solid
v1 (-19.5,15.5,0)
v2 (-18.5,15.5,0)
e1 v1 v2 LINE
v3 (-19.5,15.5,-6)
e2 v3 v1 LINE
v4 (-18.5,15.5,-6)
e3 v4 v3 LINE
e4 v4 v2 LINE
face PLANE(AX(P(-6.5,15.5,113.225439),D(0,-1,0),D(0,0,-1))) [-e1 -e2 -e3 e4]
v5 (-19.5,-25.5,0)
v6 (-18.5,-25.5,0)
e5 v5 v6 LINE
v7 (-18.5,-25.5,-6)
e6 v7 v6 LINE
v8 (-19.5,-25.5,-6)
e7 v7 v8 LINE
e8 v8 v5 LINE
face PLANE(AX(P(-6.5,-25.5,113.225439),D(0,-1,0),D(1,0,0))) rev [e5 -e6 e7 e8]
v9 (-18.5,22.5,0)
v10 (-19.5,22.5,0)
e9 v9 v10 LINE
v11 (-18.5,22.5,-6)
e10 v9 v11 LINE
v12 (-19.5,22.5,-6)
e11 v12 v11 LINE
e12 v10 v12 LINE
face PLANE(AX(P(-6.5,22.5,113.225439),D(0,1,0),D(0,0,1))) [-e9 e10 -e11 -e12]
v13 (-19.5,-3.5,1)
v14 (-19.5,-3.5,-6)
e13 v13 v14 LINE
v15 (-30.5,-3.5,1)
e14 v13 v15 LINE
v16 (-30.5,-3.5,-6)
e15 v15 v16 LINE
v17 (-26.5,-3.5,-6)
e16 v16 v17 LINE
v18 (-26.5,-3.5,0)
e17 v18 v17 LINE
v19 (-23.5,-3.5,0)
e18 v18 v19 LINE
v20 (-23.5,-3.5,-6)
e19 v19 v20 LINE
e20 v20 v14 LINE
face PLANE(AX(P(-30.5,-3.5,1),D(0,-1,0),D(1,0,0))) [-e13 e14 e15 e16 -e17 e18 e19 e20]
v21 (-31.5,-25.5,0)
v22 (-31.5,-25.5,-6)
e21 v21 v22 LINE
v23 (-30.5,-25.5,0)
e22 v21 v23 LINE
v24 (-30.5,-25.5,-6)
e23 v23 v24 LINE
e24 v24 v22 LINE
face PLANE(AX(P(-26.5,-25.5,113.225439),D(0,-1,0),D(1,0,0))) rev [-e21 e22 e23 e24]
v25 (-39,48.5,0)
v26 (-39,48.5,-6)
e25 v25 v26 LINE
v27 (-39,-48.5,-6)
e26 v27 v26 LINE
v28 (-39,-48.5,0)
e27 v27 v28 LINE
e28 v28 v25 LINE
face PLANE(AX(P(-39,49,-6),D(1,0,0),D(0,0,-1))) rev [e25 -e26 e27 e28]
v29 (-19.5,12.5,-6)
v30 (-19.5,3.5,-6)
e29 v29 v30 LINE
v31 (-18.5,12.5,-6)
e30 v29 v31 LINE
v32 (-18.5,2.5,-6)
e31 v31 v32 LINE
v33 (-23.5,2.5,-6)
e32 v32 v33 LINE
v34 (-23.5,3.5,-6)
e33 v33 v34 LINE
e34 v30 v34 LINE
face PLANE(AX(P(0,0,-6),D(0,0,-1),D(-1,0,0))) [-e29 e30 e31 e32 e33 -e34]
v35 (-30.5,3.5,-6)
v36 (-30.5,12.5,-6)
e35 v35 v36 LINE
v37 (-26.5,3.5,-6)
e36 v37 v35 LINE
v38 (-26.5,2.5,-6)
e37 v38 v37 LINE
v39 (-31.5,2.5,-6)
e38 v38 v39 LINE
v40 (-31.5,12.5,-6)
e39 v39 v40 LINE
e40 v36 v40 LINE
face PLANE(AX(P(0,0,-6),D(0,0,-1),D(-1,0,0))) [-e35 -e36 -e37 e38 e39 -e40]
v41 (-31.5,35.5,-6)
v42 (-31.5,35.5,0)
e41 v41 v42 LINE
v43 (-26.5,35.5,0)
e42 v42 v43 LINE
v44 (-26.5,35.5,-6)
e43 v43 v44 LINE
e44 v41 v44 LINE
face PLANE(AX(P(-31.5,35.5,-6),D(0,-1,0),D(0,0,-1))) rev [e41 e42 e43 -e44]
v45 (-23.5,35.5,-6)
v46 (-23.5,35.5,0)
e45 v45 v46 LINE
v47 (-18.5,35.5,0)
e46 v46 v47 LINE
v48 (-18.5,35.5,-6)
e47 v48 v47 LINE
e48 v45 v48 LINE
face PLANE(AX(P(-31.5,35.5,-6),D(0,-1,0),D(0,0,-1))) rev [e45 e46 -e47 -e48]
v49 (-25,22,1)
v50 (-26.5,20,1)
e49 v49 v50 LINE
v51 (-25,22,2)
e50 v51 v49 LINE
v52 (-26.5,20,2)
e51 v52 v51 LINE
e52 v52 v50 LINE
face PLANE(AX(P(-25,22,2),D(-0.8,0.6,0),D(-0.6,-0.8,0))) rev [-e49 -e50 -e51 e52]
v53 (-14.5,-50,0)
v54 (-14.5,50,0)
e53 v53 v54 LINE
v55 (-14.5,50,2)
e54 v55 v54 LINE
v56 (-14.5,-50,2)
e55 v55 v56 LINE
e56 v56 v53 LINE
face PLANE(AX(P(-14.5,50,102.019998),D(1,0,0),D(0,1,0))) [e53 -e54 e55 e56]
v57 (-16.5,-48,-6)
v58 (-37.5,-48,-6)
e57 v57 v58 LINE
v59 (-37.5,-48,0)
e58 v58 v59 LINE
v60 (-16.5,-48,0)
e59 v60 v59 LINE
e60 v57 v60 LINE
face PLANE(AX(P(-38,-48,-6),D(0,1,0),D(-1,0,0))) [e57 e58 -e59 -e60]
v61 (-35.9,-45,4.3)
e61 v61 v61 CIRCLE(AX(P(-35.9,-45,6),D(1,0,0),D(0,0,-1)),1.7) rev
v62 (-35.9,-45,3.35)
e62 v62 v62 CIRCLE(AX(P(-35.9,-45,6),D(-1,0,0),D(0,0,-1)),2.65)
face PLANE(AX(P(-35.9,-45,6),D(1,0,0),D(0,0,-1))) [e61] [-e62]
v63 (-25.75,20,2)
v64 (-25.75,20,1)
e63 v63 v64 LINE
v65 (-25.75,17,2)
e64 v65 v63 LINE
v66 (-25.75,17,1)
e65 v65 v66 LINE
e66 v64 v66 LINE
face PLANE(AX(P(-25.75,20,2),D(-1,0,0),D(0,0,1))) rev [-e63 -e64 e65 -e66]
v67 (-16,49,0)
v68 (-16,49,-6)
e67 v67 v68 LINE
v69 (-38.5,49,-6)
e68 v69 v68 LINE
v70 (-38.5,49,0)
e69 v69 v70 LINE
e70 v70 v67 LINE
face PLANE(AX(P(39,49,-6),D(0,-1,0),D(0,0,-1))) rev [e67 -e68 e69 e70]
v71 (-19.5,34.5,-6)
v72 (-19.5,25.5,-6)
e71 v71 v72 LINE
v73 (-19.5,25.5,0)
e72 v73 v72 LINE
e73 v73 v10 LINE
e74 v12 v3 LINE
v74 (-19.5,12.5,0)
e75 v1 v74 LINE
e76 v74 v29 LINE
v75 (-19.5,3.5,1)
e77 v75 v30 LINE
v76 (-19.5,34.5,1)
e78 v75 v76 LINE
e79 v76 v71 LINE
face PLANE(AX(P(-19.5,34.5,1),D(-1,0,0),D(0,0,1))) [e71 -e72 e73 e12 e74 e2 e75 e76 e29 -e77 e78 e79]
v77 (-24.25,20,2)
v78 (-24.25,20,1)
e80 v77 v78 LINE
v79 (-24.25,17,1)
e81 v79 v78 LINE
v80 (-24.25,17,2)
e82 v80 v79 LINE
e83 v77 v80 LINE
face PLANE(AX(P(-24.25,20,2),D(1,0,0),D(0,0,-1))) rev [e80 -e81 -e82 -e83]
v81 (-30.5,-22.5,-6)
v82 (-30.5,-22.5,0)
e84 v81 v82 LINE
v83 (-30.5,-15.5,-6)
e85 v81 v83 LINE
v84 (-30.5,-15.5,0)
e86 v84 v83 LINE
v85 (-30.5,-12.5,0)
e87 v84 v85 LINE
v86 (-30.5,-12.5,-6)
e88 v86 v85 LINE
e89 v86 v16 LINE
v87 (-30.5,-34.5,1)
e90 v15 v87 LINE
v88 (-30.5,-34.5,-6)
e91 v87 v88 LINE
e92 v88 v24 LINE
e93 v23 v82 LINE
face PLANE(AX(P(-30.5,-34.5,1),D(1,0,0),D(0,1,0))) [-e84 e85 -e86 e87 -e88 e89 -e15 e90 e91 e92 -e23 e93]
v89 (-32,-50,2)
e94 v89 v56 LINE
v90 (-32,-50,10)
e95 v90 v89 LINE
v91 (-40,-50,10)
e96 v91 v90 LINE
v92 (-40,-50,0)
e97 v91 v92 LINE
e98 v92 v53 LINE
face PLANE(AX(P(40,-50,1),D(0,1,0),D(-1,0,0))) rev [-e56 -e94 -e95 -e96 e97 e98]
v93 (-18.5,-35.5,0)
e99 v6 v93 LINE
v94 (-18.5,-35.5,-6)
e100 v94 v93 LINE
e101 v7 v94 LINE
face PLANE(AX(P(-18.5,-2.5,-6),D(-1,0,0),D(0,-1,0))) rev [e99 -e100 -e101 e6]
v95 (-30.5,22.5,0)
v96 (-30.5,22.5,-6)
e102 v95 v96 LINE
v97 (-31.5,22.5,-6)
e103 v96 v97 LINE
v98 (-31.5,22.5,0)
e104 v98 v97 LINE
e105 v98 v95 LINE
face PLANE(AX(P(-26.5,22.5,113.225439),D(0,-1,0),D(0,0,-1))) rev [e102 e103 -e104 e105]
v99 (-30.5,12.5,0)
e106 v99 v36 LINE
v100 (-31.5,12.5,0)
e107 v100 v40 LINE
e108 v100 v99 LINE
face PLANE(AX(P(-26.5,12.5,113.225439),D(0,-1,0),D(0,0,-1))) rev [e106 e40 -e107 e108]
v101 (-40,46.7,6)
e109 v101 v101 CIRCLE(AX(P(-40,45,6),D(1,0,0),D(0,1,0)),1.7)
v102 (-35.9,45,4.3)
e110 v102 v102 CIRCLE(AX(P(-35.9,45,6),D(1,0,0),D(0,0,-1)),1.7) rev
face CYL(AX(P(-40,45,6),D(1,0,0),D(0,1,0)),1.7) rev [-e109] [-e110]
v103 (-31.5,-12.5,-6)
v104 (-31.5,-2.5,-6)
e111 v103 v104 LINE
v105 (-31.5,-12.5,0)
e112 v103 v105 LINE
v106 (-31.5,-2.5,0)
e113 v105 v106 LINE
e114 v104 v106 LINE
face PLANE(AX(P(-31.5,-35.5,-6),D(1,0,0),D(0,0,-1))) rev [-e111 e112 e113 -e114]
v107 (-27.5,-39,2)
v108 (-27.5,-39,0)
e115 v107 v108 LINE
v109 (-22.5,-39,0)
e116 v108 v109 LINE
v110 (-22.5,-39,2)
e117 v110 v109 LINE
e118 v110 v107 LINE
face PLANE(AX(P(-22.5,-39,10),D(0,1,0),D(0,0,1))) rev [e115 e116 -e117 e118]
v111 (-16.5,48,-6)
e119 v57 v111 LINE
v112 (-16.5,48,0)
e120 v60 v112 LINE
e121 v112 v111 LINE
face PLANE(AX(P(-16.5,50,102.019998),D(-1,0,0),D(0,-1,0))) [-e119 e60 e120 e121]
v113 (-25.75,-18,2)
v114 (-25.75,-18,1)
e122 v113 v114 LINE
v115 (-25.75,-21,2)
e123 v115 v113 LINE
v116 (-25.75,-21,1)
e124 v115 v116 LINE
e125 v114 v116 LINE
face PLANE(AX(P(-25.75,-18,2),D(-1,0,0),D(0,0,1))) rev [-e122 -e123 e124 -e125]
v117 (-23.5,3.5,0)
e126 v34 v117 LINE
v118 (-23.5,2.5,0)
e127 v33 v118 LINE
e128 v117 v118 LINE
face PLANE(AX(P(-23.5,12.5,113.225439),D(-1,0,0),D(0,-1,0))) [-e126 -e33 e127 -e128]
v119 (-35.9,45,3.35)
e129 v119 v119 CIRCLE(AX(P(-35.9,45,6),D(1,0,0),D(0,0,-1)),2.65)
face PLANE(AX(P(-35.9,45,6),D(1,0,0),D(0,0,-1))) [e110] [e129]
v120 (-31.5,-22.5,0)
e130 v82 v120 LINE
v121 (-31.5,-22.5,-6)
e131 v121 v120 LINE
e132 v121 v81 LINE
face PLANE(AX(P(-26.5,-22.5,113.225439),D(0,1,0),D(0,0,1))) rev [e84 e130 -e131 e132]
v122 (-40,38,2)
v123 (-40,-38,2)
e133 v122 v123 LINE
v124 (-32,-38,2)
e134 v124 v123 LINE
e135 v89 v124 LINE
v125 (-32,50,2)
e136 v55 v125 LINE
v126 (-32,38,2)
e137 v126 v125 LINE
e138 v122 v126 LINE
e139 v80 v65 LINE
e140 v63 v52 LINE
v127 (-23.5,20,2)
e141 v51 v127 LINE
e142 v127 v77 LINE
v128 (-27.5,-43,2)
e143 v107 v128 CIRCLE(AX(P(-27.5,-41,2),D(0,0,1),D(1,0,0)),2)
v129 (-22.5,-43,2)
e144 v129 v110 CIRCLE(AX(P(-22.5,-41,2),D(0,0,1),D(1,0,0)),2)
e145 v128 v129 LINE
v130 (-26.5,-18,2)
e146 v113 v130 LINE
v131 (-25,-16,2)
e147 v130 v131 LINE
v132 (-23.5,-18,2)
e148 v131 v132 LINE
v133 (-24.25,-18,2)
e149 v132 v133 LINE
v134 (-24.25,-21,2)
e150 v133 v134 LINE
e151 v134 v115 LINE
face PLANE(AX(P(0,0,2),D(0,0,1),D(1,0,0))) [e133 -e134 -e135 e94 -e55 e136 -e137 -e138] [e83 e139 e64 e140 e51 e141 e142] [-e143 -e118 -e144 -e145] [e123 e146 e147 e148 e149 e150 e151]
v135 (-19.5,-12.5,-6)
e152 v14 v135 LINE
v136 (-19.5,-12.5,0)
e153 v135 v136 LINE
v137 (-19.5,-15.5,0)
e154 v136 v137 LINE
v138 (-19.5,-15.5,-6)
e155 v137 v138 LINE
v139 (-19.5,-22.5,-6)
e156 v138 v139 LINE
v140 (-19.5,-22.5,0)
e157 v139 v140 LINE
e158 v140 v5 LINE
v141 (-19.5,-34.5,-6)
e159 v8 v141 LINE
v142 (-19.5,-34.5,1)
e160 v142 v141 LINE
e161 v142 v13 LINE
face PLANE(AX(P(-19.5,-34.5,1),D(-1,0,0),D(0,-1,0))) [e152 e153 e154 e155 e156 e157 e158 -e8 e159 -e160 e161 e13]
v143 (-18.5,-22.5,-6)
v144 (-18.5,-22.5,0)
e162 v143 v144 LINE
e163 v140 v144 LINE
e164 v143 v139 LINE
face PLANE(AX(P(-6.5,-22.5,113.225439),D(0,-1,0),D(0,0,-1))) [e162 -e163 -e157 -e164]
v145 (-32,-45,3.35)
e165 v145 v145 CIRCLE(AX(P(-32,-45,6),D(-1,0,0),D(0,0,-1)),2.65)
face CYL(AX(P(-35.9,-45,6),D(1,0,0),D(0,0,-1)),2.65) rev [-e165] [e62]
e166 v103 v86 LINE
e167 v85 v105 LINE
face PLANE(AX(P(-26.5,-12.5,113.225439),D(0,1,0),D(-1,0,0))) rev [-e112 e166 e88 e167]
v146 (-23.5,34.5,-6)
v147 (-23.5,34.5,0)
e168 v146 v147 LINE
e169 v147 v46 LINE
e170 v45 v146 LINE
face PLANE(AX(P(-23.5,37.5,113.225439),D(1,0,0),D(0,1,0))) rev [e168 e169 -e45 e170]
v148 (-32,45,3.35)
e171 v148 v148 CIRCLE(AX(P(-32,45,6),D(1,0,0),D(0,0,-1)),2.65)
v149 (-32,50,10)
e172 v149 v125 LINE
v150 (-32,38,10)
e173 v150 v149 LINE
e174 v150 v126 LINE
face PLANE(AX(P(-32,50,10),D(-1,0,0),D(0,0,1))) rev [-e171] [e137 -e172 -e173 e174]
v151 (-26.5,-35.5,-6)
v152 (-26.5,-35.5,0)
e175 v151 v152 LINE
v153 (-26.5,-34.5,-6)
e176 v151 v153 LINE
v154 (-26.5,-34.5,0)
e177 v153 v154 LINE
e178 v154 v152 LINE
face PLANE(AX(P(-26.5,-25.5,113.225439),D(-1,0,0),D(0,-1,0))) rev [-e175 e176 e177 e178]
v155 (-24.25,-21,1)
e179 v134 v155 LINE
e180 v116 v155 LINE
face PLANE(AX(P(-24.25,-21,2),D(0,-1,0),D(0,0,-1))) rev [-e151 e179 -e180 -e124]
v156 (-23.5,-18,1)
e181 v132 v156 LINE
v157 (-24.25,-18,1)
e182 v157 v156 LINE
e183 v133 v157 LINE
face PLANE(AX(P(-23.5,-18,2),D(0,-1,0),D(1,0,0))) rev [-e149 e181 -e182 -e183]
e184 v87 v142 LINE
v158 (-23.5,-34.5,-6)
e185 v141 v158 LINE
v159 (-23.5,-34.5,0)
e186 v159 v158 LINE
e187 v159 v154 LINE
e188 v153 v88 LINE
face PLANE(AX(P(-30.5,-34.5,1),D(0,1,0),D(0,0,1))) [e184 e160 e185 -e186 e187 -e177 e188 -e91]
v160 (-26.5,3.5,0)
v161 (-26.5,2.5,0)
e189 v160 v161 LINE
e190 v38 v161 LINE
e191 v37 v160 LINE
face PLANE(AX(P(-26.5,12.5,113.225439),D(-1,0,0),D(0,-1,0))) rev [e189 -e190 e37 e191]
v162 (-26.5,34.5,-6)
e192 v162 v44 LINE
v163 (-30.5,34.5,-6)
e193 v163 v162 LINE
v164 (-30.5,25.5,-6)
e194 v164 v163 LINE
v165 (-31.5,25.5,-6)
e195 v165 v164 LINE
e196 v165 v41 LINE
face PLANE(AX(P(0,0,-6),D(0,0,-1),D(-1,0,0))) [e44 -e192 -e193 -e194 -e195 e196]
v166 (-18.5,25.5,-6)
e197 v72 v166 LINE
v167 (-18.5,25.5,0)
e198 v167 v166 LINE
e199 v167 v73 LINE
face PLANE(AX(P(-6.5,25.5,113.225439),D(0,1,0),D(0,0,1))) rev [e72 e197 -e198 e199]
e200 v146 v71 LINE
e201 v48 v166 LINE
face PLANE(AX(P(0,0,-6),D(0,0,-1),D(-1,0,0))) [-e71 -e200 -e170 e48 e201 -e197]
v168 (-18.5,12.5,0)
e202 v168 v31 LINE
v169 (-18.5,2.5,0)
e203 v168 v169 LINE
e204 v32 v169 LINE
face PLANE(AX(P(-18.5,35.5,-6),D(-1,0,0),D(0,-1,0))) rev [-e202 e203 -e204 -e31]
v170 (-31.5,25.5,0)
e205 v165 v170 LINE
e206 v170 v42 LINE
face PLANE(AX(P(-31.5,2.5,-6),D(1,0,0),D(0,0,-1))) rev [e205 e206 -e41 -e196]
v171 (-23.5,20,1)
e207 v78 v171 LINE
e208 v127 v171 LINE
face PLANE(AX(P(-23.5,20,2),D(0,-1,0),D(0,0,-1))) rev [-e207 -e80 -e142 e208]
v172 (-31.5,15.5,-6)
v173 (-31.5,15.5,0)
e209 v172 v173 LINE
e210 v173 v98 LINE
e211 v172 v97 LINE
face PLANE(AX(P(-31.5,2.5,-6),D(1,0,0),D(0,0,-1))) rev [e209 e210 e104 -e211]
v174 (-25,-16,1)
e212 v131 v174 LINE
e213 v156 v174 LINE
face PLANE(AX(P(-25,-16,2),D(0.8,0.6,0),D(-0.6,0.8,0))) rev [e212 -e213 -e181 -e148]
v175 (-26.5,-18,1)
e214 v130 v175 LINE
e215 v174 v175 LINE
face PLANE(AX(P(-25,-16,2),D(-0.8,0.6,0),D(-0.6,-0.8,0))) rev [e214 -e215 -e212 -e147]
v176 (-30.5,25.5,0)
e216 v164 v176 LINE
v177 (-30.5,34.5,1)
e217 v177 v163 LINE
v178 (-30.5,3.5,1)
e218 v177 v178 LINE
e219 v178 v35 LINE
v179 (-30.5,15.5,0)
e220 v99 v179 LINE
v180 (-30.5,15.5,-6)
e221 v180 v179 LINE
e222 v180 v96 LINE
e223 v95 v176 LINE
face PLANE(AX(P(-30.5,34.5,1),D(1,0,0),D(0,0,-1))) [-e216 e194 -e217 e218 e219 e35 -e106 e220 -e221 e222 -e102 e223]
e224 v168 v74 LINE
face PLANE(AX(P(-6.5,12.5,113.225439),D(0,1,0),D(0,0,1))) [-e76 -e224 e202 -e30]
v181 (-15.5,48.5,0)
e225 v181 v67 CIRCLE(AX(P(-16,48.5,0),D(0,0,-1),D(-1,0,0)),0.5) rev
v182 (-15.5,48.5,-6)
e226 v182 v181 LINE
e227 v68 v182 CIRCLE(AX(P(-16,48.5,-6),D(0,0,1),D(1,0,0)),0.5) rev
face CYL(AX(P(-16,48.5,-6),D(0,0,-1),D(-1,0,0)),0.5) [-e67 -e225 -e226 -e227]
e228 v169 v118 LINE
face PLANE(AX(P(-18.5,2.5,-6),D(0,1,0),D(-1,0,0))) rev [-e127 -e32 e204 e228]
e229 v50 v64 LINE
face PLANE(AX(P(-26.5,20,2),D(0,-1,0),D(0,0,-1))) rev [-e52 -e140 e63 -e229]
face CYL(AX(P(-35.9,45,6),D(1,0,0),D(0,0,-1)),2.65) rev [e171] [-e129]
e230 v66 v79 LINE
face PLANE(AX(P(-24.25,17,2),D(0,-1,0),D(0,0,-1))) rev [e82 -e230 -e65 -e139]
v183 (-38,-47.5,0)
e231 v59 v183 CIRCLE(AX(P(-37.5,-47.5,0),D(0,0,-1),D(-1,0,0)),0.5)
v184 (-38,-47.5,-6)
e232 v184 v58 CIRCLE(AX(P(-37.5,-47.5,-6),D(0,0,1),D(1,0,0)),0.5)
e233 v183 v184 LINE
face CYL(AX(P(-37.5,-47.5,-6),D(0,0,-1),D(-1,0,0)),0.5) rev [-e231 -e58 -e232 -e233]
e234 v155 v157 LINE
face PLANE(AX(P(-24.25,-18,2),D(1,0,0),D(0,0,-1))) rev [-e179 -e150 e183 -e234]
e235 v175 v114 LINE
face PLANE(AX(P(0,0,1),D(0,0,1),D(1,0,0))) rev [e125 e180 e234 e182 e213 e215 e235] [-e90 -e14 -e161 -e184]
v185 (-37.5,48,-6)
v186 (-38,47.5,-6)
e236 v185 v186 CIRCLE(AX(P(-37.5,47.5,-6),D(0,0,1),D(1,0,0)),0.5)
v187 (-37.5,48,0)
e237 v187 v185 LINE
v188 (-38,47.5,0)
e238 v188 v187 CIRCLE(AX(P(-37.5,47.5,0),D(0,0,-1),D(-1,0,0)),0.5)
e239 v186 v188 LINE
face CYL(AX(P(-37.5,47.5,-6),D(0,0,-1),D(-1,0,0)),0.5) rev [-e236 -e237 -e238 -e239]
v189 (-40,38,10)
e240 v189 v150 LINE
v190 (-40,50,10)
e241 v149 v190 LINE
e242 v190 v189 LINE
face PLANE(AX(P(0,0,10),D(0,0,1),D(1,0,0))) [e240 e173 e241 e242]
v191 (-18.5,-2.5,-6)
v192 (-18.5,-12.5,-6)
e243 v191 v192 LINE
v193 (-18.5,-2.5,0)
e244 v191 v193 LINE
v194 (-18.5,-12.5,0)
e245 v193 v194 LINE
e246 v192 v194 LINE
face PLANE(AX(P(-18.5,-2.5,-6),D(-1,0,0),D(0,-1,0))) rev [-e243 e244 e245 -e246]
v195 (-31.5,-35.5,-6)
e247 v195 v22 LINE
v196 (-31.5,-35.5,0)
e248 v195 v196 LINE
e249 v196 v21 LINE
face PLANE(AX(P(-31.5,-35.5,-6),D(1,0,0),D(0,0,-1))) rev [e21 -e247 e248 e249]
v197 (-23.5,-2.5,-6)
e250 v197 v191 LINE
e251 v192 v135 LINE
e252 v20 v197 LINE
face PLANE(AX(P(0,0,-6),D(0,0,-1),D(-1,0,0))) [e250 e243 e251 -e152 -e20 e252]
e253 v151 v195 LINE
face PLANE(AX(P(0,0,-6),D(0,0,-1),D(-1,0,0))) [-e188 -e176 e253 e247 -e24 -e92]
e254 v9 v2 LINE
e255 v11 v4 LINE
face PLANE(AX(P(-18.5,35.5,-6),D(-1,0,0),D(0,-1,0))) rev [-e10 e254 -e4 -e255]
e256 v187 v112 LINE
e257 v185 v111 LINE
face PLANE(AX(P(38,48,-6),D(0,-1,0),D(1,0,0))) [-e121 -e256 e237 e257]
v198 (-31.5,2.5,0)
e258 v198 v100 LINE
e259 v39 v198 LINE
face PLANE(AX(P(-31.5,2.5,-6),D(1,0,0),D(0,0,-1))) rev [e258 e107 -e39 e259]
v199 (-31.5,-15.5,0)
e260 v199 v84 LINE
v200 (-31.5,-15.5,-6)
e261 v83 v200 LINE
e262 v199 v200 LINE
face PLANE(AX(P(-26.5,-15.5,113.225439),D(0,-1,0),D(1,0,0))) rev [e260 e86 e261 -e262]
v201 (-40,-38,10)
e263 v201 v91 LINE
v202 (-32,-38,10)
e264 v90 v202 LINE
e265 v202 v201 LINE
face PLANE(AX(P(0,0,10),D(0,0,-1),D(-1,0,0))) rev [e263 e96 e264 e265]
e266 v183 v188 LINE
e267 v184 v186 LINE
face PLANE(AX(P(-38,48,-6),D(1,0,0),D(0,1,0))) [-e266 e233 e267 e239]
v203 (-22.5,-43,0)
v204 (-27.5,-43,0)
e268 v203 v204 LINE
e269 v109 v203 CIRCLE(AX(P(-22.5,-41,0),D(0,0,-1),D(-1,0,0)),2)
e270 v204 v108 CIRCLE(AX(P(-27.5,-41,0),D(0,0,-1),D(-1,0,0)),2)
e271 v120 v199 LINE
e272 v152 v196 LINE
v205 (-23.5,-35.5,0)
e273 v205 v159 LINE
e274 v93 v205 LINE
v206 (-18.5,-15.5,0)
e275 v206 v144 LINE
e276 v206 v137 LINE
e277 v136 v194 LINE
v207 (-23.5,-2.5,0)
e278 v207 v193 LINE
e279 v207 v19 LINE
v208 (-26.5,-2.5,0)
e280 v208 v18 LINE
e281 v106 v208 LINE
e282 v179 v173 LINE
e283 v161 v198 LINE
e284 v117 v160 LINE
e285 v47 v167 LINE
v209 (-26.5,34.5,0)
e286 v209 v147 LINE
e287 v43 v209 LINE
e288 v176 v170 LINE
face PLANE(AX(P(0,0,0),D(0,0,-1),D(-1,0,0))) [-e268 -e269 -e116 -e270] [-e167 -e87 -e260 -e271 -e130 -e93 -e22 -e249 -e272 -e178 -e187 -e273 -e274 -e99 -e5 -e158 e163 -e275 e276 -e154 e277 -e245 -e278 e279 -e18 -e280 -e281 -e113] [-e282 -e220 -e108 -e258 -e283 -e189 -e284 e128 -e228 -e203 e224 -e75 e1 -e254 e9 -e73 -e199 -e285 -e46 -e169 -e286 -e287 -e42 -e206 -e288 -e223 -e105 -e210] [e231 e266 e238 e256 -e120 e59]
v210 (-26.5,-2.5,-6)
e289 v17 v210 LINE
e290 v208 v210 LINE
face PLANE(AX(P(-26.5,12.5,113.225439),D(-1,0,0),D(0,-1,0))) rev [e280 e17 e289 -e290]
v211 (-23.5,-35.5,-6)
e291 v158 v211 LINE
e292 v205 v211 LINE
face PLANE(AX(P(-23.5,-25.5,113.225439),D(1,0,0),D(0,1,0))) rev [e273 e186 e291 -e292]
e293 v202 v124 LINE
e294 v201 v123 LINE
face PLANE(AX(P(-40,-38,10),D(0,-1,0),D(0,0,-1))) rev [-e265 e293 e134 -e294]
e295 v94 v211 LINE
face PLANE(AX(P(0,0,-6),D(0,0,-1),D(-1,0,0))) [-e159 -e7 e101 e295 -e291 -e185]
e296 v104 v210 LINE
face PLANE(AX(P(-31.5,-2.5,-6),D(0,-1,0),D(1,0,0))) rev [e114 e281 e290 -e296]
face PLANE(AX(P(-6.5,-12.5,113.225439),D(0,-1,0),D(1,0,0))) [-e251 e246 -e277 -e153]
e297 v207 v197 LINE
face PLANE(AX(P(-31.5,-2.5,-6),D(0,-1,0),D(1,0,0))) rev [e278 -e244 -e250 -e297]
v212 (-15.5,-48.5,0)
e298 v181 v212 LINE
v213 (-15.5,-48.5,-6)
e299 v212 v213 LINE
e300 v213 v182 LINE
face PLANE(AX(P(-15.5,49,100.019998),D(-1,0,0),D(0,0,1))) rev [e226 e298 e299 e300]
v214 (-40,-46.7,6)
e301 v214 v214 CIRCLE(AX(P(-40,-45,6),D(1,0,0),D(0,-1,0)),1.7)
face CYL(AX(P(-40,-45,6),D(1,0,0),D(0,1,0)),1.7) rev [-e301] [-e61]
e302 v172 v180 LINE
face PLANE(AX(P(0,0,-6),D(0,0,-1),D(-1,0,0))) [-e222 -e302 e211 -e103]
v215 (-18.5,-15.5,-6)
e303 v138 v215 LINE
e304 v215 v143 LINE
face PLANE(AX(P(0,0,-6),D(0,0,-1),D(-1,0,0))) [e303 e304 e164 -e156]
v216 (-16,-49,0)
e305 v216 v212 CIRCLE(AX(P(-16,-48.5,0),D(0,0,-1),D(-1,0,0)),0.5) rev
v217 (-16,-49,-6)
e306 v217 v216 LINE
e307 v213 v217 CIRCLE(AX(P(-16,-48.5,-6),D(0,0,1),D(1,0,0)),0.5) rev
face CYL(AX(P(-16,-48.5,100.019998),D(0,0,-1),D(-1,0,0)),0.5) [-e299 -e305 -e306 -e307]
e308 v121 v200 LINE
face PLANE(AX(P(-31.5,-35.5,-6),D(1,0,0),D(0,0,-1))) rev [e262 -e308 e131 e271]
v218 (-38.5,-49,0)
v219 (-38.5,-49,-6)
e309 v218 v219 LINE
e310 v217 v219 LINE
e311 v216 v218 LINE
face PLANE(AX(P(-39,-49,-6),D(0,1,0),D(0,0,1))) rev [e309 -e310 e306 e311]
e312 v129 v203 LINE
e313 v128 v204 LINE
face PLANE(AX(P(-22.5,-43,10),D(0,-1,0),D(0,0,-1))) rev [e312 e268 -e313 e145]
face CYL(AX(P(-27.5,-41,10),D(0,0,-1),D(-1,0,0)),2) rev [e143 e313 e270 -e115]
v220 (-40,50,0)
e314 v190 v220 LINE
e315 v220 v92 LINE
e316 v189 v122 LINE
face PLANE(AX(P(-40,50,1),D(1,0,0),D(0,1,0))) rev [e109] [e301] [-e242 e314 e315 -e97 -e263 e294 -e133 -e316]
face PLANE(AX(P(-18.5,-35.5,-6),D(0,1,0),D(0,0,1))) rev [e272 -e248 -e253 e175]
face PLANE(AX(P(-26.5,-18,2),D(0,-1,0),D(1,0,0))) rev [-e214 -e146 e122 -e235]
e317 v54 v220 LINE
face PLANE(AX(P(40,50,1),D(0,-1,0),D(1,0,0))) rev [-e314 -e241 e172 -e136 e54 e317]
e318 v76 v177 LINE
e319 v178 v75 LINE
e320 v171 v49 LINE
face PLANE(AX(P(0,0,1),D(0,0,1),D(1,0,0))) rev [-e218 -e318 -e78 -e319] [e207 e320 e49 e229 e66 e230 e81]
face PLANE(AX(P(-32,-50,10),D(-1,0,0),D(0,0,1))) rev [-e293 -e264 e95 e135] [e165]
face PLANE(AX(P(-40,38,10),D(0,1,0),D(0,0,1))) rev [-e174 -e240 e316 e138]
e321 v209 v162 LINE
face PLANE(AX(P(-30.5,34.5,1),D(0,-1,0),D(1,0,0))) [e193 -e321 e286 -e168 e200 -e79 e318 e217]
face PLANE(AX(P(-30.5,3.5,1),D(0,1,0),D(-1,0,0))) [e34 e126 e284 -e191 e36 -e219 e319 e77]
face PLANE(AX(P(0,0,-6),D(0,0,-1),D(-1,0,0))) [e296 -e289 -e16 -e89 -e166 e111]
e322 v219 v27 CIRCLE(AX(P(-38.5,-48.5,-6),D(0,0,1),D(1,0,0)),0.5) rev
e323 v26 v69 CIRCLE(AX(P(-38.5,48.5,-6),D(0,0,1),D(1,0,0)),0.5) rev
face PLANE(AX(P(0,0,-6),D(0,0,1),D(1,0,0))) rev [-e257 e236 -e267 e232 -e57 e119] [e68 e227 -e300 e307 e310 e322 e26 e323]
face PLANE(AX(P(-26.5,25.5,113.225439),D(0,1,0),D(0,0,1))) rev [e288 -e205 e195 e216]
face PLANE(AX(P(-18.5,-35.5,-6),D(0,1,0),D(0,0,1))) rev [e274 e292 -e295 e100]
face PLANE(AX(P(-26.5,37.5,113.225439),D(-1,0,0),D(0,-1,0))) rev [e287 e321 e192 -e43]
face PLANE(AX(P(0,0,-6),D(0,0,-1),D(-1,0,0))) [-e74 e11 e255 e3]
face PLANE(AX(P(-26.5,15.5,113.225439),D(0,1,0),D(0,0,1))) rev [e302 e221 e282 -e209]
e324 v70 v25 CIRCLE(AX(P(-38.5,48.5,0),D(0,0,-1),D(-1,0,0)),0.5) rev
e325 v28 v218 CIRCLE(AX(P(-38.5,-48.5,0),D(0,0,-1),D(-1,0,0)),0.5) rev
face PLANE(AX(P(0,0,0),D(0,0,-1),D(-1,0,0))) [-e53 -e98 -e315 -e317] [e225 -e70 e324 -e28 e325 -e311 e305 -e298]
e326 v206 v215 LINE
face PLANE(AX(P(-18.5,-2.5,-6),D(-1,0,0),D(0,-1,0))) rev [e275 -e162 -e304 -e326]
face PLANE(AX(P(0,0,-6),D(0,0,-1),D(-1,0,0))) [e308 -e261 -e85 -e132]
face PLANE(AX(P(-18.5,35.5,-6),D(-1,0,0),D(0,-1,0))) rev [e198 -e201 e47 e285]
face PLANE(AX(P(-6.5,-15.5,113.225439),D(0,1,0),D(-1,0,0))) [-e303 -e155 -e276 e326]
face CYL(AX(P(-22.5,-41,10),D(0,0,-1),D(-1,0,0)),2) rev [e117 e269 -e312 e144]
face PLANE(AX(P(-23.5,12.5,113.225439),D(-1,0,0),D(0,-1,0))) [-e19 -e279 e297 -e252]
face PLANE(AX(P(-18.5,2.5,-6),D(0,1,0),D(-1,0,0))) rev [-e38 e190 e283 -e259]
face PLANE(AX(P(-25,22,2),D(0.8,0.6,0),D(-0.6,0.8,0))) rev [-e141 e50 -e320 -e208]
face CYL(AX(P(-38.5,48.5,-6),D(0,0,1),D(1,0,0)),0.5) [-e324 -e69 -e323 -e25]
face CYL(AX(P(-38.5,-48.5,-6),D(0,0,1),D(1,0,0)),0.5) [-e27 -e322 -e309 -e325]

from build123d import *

# Parameters (mm, degrees)
SKETCH1_W               = 80
SKETCH1_H               = 100
SKETCH1_W_2             = 31
SKETCH1_H_2             = 11
SKETCH1_W_3             = 11
SKETCH1_H_3             = 31
BOSS_EXTRUDE1_DEPTH     = 1
SKETCH2_W               = 80
SKETCH2_H               = 100
BACK_DEPTH              = 1
SKETCH3_W               = 13
SKETCH3_H               = 33
SKETCH3_W_2             = 11
SKETCH3_H_2             = 31
SKETCH3_W_3             = 33
SKETCH3_H_3             = 13
SKETCH3_W_4             = 31
SKETCH3_H_4             = 11
SEG_MASKS_DEPTH         = 6
SKETCH5_W               = 78
SKETCH5_H               = 98
SKETCH5_W_2             = 76
SKETCH5_H_2             = 96
OUTER_RIM_DEPTH         = 6
DIRECTION_DEPTH         = 65.412731661
DIRECTION_DEPTH_BACK    = 65.412731661
SKETCH7_W               = 17
SKETCH7_H               = 7
SKETCH7_W_2             = 7
SKETCH7_H_2             = 11.013011135
SKETCH7_H_3             = 10.96937703
SKETCH7_H_4             = 11.03062297
WIRE_CHASES_DEPTH       = 6
HANGING_HOLE_DEPTH      = 65.311740763
HANGING_HOLE_DEPTH_BACK = 65.311740763
FILLET1_R               = 0.5
SKETCH9_W               = 8
SKETCH9_H               = 12
BOSS_EXTRUDE2_DEPTH     = 8
CUT_EXTRUDE1_DEPTH      = 95.868329805
CUT_EXTRUDE1_DEPTH_BACK = 95.868329805
SKETCH10_R              = 1.7
SKETCH11_R              = 2.65
CUT_EXTRUDE2_DEPTH      = 3.9
MIRROR4_COPY_1_SKETCH_R = 2.65
MIRROR4_COPY_1_DEPTH    = 3.9
MIRROR4_COPY_2_SKETCH_R = 2.65
MIRROR4_COPY_2_DEPTH    = 3.9
SKETCH12_W              = 1.5
SKETCH12_H              = 7
BOSS_EXTRUDE3_DEPTH     = 6
SKETCH13_W              = 15.5
SKETCH13_H              = 1.5
BOSS_EXTRUDE4_DEPTH     = 1.5
FILLET2_R               = 1.5
CUT_EXTRUDE3_DEPTH      = 65.807406984
CUT_EXTRUDE3_DEPTH_BACK = 65.807406984
CUT_EXTRUDE4_DEPTH      = 65.807406984
CUT_EXTRUDE4_DEPTH_BACK = 65.807406984
SKETCH15_W              = 64.445806935
SKETCH15_H              = 114.080539226
SKETCH16_W              = 2
SKETCH16_H              = 100
BOSS_EXTRUDE5_DEPTH     = 8
CUT_EXTRUDE5_DEPTH      = 65.807406984
CUT_EXTRUDE5_DEPTH_BACK = 65.807406984
CUT_EXTRUDE6_DEPTH      = 6
FILLET3_R               = 0.5


with BuildPart() as part:
    # Sketch1 → Boss-Extrude1 (new body)
    with BuildSketch(Plane.XY):
        Rectangle(SKETCH1_W, SKETCH1_H)
        with Locations((0, 38)):
            Rectangle(SKETCH1_W_2, SKETCH1_H_2, mode=Mode.SUBTRACT)
        Rectangle(SKETCH1_W_2, SKETCH1_H_2, mode=Mode.SUBTRACT)
        with Locations((0, -38)):
            Rectangle(SKETCH1_W_2, SKETCH1_H_2, mode=Mode.SUBTRACT)
        with Locations((25, 19)):
            Rectangle(SKETCH1_W_3, SKETCH1_H_3, mode=Mode.SUBTRACT)
        with Locations((-25, 19)):
            Rectangle(SKETCH1_W_3, SKETCH1_H_3, mode=Mode.SUBTRACT)
        with Locations((-25, -19)):
            Rectangle(SKETCH1_W_3, SKETCH1_H_3, mode=Mode.SUBTRACT)
        with Locations((25, -19)):
            Rectangle(SKETCH1_W_3, SKETCH1_H_3, mode=Mode.SUBTRACT)
    extrude(amount=BOSS_EXTRUDE1_DEPTH)

    # Sketch2 → back (add)
    with BuildSketch(Plane.XY.offset(1)):
        Rectangle(SKETCH2_W, SKETCH2_H)
    extrude(amount=BACK_DEPTH)

    # Sketch3 → seg masks (add)
    # profile 1 of 7: a face of its own
    with BuildSketch(Plane(origin=(0, 0, 0), x_dir=(-1, 0, 0), z_dir=(0, 0, -1))):
        with Locations((-25, 19)):
            Rectangle(SKETCH3_W, SKETCH3_H)
        with Locations((-25, 19)):
            Rectangle(SKETCH3_W_2, SKETCH3_H_2, mode=Mode.SUBTRACT)
    # profile 2 of 7: a face of its own
    with BuildSketch(Plane(origin=(0, 0, 0), x_dir=(-1, 0, 0), z_dir=(0, 0, -1))):
        with Locations((0, 38)):
            Rectangle(SKETCH3_W_3, SKETCH3_H_3)
        with Locations((0, 38)):
            Rectangle(SKETCH3_W_4, SKETCH3_H_4, mode=Mode.SUBTRACT)
    # profile 3 of 7: a face of its own
    with BuildSketch(Plane(origin=(0, 0, 0), x_dir=(-1, 0, 0), z_dir=(0, 0, -1))):
        with Locations((25, 19)):
            Rectangle(SKETCH3_W, SKETCH3_H)
        with Locations((25, 19)):
            Rectangle(SKETCH3_W_2, SKETCH3_H_2, mode=Mode.SUBTRACT)
    # profile 4 of 7: a face of its own
    with BuildSketch(Plane(origin=(0, 0, 0), x_dir=(-1, 0, 0), z_dir=(0, 0, -1))):
        Rectangle(SKETCH3_W_3, SKETCH3_H_3)
        Rectangle(SKETCH3_W_4, SKETCH3_H_4, mode=Mode.SUBTRACT)
    # profile 5 of 7: a face of its own
    with BuildSketch(Plane(origin=(0, 0, 0), x_dir=(-1, 0, 0), z_dir=(0, 0, -1))):
        with Locations((-25, -19)):
            Rectangle(SKETCH3_W, SKETCH3_H)
        with Locations((-25, -19)):
            Rectangle(SKETCH3_W_2, SKETCH3_H_2, mode=Mode.SUBTRACT)
    # profile 6 of 7: a face of its own
    with BuildSketch(Plane(origin=(0, 0, 0), x_dir=(-1, 0, 0), z_dir=(0, 0, -1))):
        with Locations((0, -38)):
            Rectangle(SKETCH3_W_3, SKETCH3_H_3)
        with Locations((0, -38)):
            Rectangle(SKETCH3_W_4, SKETCH3_H_4, mode=Mode.SUBTRACT)
    # profile 7 of 7: a face of its own
    with BuildSketch(Plane(origin=(0, 0, 0), x_dir=(-1, 0, 0), z_dir=(0, 0, -1))):
        with Locations((25, -19)):
            Rectangle(SKETCH3_W, SKETCH3_H)
        with Locations((25, -19)):
            Rectangle(SKETCH3_W_2, SKETCH3_H_2, mode=Mode.SUBTRACT)
    extrude(amount=SEG_MASKS_DEPTH)

    # Sketch5 → outer rim (add)
    with BuildSketch(Plane(origin=(0, 0, 0), x_dir=(-1, 0, 0), z_dir=(0, 0, -1))):
        Rectangle(SKETCH5_W, SKETCH5_H)
        Rectangle(SKETCH5_W_2, SKETCH5_H_2, mode=Mode.SUBTRACT)
    extrude(amount=OUTER_RIM_DEPTH)

    # Sketch6 → direction (cut, two sides: drawn at the far end of the back side and taken through both)
    with BuildSketch(Plane(origin=(0, 0, 1), x_dir=(-1, 0, 0), z_dir=(0, 0, -1)).offset(-DIRECTION_DEPTH_BACK)):
        Polygon((25, 22), (23.5, 20), (24.25, 20), (24.25, 17), (25.75, 17), (25.75, 20), (26.5, 20), align=None)
        Polygon((-3, 38), (-1, 36.5), (-1, 37.25), (2, 37.25), (2, 38.75), (-1, 38.75), (-1, 39.5), align=None)
        Polygon((-24.25, 21), (-25.75, 21), (-25.75, 18.5), (-26.5, 18.5), (-25, 16), (-23.5, 18.5), (-24.25, 18.5), align=None)
        Polygon((-24.25, -17), (-25.75, -17), (-25.75, -20), (-26.5, -20), (-25, -22), (-23.5, -20), (-24.25, -20), align=None)
        Polygon((-2, -38.75), (-2, -37.25), (1, -37.25), (1, -36.5), (3, -38), (1, -39.5), (1, -38.75), align=None)
        Polygon((25, -16), (23.5, -18), (24.25, -18), (24.25, -21), (25.75, -21), (25.75, -18), (26.5, -18), align=None)
        Polygon((-0.5, 1.5), (-3, 0), (-0.5, -1.5), (-0.5, -0.75), (2, -0.75), (2, 0), (2, 0.75), (-0.5, 0.75), align=None)
    extrude(amount=DIRECTION_DEPTH + DIRECTION_DEPTH_BACK, mode=Mode.SUBTRACT)

    # Sketch7 → wire chases (cut)
    with BuildSketch(Plane(origin=(0, 0, -6), x_dir=(-1, 0, 0), z_dir=(0, 0, -1))):
        Polygon((-6.5, 46), (-3.5, 46), (-3.5, 39.513011135), (3.5, 39.513011135), (3.5, 46), (6.5, 46), (6.5, 39.513011135), (18, 39.513011135), (18, 36.513011135), (6.5, 36.513011135), (6.5, 25.5), (23.5, 25.5), (23.5, 37.5), (26.5, 37.5), (26.5, 25.5), (33, 25.5), (33, 22.5), (26.5, 22.5), (26.5, 15.5), (33, 15.5), (33, 12.5), (26.5, 12.5), (26.5, -12.5), (33, -12.5), (33, -15.5), (26.5, -15.5), (26.5, -22.5), (33, -22.5), (33, -25.5), (26.5, -25.5), (26.5, -37.5), (23.5, -37.5), (23.5, -25.5), (6.5, -25.5), (6.5, -36.513011135), (18, -36.513011135), (18, -39.513011135), (6.5, -39.513011135), (6.5, -46), (3.5, -46), (3.5, -39.513011135), (-3.5, -39.513011135), (-3.5, -46), (-6.5, -46), (-6.5, -39.513011135), (-18, -39.513011135), (-18, -36.513011135), (-6.5, -36.513011135), (-6.5, -25.5), (-23.5, -25.5), (-23.5, -37.5), (-26.5, -37.5), (-26.5, -25.5), (-33, -25.5), (-33, -22.5), (-26.5, -22.5), (-26.5, -15.5), (-33, -15.5), (-33, -12.5), (-26.5, -12.5), (-26.5, 12.5), (-33, 12.5), (-33, 15.5), (-26.5, 15.5), (-26.5, 22.5), (-33, 22.5), (-33, 25.5), (-26.5, 25.5), (-26.5, 37.5), (-23.5, 37.5), (-23.5, 25.5), (-6.5, 25.5), (-6.5, 36.513011135), (-18, 36.513011135), (-18, 39.513011135), (-6.5, 39.513011135), align=None)
        with Locations((-15, 19)):
            Rectangle(SKETCH7_W, SKETCH7_H, mode=Mode.SUBTRACT)
        with Locations((0, 31.006505567)):
            Rectangle(SKETCH7_W_2, SKETCH7_H_2, mode=Mode.SUBTRACT)
        with Locations((0, 19)):
            Rectangle(SKETCH7_W_2, SKETCH7_H, mode=Mode.SUBTRACT)
        with Locations((15, 19)):
            Rectangle(SKETCH7_W, SKETCH7_H, mode=Mode.SUBTRACT)
        Polygon((-6.5, 12.5), (-6.5, 1.53062297), (-18, 1.53062297), (-18, -1.46937703), (-6.5, -1.46937703), (-6.5, -12.5), (-23.5, -12.5), (-23.5, 12.5), align=None, mode=Mode.SUBTRACT)
        with Locations((0, 7.015311485)):
            Rectangle(SKETCH7_W_2, SKETCH7_H_3, mode=Mode.SUBTRACT)
        Polygon((6.5, 12.5), (23.5, 12.5), (23.5, -12.5), (6.5, -12.5), (6.5, -1.46937703), (18, -1.46937703), (18, 1.53062297), (6.5, 1.53062297), align=None, mode=Mode.SUBTRACT)
        with Locations((-15, -19)):
            Rectangle(SKETCH7_W, SKETCH7_H, mode=Mode.SUBTRACT)
        with Locations((0, -6.984688515)):
            Rectangle(SKETCH7_W_2, SKETCH7_H_4, mode=Mode.SUBTRACT)
        with Locations((0, -19)):
            Rectangle(SKETCH7_W_2, SKETCH7_H, mode=Mode.SUBTRACT)
        with Locations((15, -19)):
            Rectangle(SKETCH7_W, SKETCH7_H, mode=Mode.SUBTRACT)
        with Locations((0, -31.006505567)):
            Rectangle(SKETCH7_W_2, SKETCH7_H_2, mode=Mode.SUBTRACT)
    extrude(amount=-WIRE_CHASES_DEPTH, mode=Mode.SUBTRACT)

    # Sketch8 → hanging hole (cut, two sides: drawn at the far end of the back side and taken through both)
    with BuildSketch(Plane(origin=(0, 0, 0), x_dir=(-1, 0, 0), z_dir=(0, 0, -1)).offset(-HANGING_HOLE_DEPTH_BACK)):
        with BuildLine():
            Line((2, 27), (2, 22.464101615))
            ThreePointArc((2, 22.464101615), (0, 15), (-2, 22.464101615))
            Line((-2, 22.464101615), (-2, 27))
            ThreePointArc((-2, 27), (0, 29), (2, 27))
        make_face()
    extrude(amount=HANGING_HOLE_DEPTH + HANGING_HOLE_DEPTH_BACK, mode=Mode.SUBTRACT)

    # Fillet1
    fillet1_edges = [part.edges().sort_by_distance(p)[0] for p in [
        (-39, -49, -3),
        (-39, 49, -3),
        (39, 49, -3),
        (39, -49, -3),
        (38, -48, -3),
        (-38, -48, -3),
        (-38, 48, -3),
        (38, 48, -3),
    ]]
    fillet(fillet1_edges, radius=FILLET1_R)

    # Sketch9 → Boss-Extrude2 (add)
    with BuildSketch(Plane.XY.offset(2)):
        with Locations((-36, 44)):
            Rectangle(SKETCH9_W, SKETCH9_H)
        with Locations((-36, -44)):
            Rectangle(SKETCH9_W, SKETCH9_H)
        with Locations((36, -44)):
            Rectangle(SKETCH9_W, SKETCH9_H)
        with Locations((36, 44)):
            Rectangle(SKETCH9_W, SKETCH9_H)
    extrude(amount=BOSS_EXTRUDE2_DEPTH)

    # Sketch10 → Cut-Extrude1 (cut, two sides: drawn at the far end of the back side and taken through both)
    with BuildSketch(Plane(origin=(40, 0, 0), x_dir=(0, 0, -1), z_dir=(1, 0, 0)).offset(-CUT_EXTRUDE1_DEPTH_BACK)):
        with Locations((-6, 45)):
            Circle(SKETCH10_R)
        with Locations((-6, -45)):
            Circle(SKETCH10_R)
    extrude(amount=CUT_EXTRUDE1_DEPTH + CUT_EXTRUDE1_DEPTH_BACK, mode=Mode.SUBTRACT)

    # Sketch11 → Cut-Extrude2 (cut)
    with BuildSketch(Plane(origin=(-32, 0, 0), x_dir=(0, 0, -1), z_dir=(1, 0, 0))):
        with Locations((-6, 45)):
            Circle(SKETCH11_R)
    cut_extrude2 = extrude(amount=-CUT_EXTRUDE2_DEPTH, mode=Mode.SUBTRACT)

    # Mirror1: Cut-Extrude2 across plane
    add(cut_extrude2.mirror(Plane.ZX), mode=Mode.SUBTRACT)

    # Mirror2: Cut-Extrude2 across plane
    add(cut_extrude2.mirror(Plane(origin=(0, 0, 0), x_dir=(0, 0, 1), z_dir=(1, 0, 0))), mode=Mode.SUBTRACT)

    # Mirror4 copy 1 sketch → Mirror4 copy 1 (cut)
    with BuildSketch(Plane(origin=(32, 0, 0), x_dir=(0, 0, -1), z_dir=(-1, 0, 0))):
        with Locations((-6, 45)):
            Circle(MIRROR4_COPY_1_SKETCH_R)
    extrude(amount=-MIRROR4_COPY_1_DEPTH, mode=Mode.SUBTRACT)

    # Mirror4 copy 2 sketch → Mirror4 copy 2 (cut)
    with BuildSketch(Plane(origin=(32, 0, 0), x_dir=(0, 0, -1), z_dir=(-1, 0, 0))):
        with Locations((-6, -45)):
            Circle(MIRROR4_COPY_2_SKETCH_R)
    extrude(amount=-MIRROR4_COPY_2_DEPTH, mode=Mode.SUBTRACT)

    # Sketch12 → Boss-Extrude3 (add)
    with BuildSketch(Plane.XY.offset(2)):
        with Locations((7.25, -18.5)):
            Rectangle(SKETCH12_W, SKETCH12_H)
        with Locations((21.25, -18.5)):
            Rectangle(SKETCH12_W, SKETCH12_H)
    extrude(amount=BOSS_EXTRUDE3_DEPTH)

    # Sketch13 → Boss-Extrude4 (add)
    with BuildSketch(Plane.XY.offset(2)):
        with Locations((14.25, -14.25)):
            Rectangle(SKETCH13_W, SKETCH13_H)
    extrude(amount=BOSS_EXTRUDE4_DEPTH)

    # Fillet2
    fillet2_edges = [part.edges().sort_by_distance(p)[0] for p in [
        (22, -17.75, 2),
        (14.25, -13.5, 2),
        (6.5, -17.75, 2),
    ]]
    fillet(fillet2_edges, radius=FILLET2_R - 0.0001)  # a hair under: the kernel refuses the full size

    # Sketch14 → Cut-Extrude3 (cut, two sides: drawn at the far end of the back side and taken through both)
    with BuildSketch(Plane(origin=(0, 0, 0), x_dir=(-1, 0, 0), z_dir=(0, 0, -1)).offset(-CUT_EXTRUDE3_DEPTH_BACK)):
        with BuildLine():
            Line((-2.5, -18), (2.5, -18))
            ThreePointArc((2.5, -18), (4.5, -20), (2.5, -22))
            Line((2.5, -22), (-2.5, -22))
            ThreePointArc((-2.5, -22), (-4.5, -20), (-2.5, -18))
        make_face()
    extrude(amount=CUT_EXTRUDE3_DEPTH + CUT_EXTRUDE3_DEPTH_BACK, mode=Mode.SUBTRACT)

    # Sketch15 → Cut-Extrude4 (cut, two sides: drawn at the far end of the back side and taken through both)
    with BuildSketch(Plane(origin=(0, 0, 0), x_dir=(-1, 0, 0), z_dir=(0, 0, -1)).offset(-CUT_EXTRUDE4_DEPTH_BACK)):
        with Locations((-15.722903468, -0.440805793)):
            Rectangle(SKETCH15_W, SKETCH15_H)
    extrude(amount=CUT_EXTRUDE4_DEPTH + CUT_EXTRUDE4_DEPTH_BACK, mode=Mode.SUBTRACT)

    # Sketch16 → Boss-Extrude5 (add)
    with BuildSketch(Plane(origin=(0, 0, -6), x_dir=(-1, 0, 0), z_dir=(0, 0, -1))):
        with Locations((15.5, 0)):
            Rectangle(SKETCH16_W, SKETCH16_H)
    extrude(amount=-BOSS_EXTRUDE5_DEPTH)

    # Sketch17 → Cut-Extrude5 (cut, two sides: drawn at the far end of the back side and taken through both)
    with BuildSketch(Plane(origin=(0, 0, 0), x_dir=(-1, 0, 0), z_dir=(0, 0, -1)).offset(-CUT_EXTRUDE5_DEPTH_BACK)):
        with BuildLine():
            Line((22.5, -39), (27.5, -39))
            ThreePointArc((27.5, -39), (29.5, -41), (27.5, -43))
            Line((27.5, -43), (22.5, -43))
            ThreePointArc((22.5, -43), (20.5, -41), (22.5, -39))
        make_face()
    extrude(amount=CUT_EXTRUDE5_DEPTH + CUT_EXTRUDE5_DEPTH_BACK, mode=Mode.SUBTRACT)

    # Sketch18 → Cut-Extrude6 (cut)
    with BuildSketch(Plane(origin=(0, 0, -6), x_dir=(-1, 0, 0), z_dir=(0, 0, -1))):
        Polygon((14.5, 50), (15.5, 50), (16.5, 50), (16.5, 49), (15.5, 49), (15.5, -49), (16.5, -49), (16.5, -50), (15.5, -50), (14.5, -50), align=None)
    extrude(amount=-CUT_EXTRUDE6_DEPTH, mode=Mode.SUBTRACT)

    # Fillet3
    fillet3_edges = [part.edges().sort_by_distance(p)[0] for p in [
        (-15.5, 49, -3),
        (-15.5, -49, -3),
    ]]
    fillet(fillet3_edges, radius=FILLET3_R)


solid = part.part
